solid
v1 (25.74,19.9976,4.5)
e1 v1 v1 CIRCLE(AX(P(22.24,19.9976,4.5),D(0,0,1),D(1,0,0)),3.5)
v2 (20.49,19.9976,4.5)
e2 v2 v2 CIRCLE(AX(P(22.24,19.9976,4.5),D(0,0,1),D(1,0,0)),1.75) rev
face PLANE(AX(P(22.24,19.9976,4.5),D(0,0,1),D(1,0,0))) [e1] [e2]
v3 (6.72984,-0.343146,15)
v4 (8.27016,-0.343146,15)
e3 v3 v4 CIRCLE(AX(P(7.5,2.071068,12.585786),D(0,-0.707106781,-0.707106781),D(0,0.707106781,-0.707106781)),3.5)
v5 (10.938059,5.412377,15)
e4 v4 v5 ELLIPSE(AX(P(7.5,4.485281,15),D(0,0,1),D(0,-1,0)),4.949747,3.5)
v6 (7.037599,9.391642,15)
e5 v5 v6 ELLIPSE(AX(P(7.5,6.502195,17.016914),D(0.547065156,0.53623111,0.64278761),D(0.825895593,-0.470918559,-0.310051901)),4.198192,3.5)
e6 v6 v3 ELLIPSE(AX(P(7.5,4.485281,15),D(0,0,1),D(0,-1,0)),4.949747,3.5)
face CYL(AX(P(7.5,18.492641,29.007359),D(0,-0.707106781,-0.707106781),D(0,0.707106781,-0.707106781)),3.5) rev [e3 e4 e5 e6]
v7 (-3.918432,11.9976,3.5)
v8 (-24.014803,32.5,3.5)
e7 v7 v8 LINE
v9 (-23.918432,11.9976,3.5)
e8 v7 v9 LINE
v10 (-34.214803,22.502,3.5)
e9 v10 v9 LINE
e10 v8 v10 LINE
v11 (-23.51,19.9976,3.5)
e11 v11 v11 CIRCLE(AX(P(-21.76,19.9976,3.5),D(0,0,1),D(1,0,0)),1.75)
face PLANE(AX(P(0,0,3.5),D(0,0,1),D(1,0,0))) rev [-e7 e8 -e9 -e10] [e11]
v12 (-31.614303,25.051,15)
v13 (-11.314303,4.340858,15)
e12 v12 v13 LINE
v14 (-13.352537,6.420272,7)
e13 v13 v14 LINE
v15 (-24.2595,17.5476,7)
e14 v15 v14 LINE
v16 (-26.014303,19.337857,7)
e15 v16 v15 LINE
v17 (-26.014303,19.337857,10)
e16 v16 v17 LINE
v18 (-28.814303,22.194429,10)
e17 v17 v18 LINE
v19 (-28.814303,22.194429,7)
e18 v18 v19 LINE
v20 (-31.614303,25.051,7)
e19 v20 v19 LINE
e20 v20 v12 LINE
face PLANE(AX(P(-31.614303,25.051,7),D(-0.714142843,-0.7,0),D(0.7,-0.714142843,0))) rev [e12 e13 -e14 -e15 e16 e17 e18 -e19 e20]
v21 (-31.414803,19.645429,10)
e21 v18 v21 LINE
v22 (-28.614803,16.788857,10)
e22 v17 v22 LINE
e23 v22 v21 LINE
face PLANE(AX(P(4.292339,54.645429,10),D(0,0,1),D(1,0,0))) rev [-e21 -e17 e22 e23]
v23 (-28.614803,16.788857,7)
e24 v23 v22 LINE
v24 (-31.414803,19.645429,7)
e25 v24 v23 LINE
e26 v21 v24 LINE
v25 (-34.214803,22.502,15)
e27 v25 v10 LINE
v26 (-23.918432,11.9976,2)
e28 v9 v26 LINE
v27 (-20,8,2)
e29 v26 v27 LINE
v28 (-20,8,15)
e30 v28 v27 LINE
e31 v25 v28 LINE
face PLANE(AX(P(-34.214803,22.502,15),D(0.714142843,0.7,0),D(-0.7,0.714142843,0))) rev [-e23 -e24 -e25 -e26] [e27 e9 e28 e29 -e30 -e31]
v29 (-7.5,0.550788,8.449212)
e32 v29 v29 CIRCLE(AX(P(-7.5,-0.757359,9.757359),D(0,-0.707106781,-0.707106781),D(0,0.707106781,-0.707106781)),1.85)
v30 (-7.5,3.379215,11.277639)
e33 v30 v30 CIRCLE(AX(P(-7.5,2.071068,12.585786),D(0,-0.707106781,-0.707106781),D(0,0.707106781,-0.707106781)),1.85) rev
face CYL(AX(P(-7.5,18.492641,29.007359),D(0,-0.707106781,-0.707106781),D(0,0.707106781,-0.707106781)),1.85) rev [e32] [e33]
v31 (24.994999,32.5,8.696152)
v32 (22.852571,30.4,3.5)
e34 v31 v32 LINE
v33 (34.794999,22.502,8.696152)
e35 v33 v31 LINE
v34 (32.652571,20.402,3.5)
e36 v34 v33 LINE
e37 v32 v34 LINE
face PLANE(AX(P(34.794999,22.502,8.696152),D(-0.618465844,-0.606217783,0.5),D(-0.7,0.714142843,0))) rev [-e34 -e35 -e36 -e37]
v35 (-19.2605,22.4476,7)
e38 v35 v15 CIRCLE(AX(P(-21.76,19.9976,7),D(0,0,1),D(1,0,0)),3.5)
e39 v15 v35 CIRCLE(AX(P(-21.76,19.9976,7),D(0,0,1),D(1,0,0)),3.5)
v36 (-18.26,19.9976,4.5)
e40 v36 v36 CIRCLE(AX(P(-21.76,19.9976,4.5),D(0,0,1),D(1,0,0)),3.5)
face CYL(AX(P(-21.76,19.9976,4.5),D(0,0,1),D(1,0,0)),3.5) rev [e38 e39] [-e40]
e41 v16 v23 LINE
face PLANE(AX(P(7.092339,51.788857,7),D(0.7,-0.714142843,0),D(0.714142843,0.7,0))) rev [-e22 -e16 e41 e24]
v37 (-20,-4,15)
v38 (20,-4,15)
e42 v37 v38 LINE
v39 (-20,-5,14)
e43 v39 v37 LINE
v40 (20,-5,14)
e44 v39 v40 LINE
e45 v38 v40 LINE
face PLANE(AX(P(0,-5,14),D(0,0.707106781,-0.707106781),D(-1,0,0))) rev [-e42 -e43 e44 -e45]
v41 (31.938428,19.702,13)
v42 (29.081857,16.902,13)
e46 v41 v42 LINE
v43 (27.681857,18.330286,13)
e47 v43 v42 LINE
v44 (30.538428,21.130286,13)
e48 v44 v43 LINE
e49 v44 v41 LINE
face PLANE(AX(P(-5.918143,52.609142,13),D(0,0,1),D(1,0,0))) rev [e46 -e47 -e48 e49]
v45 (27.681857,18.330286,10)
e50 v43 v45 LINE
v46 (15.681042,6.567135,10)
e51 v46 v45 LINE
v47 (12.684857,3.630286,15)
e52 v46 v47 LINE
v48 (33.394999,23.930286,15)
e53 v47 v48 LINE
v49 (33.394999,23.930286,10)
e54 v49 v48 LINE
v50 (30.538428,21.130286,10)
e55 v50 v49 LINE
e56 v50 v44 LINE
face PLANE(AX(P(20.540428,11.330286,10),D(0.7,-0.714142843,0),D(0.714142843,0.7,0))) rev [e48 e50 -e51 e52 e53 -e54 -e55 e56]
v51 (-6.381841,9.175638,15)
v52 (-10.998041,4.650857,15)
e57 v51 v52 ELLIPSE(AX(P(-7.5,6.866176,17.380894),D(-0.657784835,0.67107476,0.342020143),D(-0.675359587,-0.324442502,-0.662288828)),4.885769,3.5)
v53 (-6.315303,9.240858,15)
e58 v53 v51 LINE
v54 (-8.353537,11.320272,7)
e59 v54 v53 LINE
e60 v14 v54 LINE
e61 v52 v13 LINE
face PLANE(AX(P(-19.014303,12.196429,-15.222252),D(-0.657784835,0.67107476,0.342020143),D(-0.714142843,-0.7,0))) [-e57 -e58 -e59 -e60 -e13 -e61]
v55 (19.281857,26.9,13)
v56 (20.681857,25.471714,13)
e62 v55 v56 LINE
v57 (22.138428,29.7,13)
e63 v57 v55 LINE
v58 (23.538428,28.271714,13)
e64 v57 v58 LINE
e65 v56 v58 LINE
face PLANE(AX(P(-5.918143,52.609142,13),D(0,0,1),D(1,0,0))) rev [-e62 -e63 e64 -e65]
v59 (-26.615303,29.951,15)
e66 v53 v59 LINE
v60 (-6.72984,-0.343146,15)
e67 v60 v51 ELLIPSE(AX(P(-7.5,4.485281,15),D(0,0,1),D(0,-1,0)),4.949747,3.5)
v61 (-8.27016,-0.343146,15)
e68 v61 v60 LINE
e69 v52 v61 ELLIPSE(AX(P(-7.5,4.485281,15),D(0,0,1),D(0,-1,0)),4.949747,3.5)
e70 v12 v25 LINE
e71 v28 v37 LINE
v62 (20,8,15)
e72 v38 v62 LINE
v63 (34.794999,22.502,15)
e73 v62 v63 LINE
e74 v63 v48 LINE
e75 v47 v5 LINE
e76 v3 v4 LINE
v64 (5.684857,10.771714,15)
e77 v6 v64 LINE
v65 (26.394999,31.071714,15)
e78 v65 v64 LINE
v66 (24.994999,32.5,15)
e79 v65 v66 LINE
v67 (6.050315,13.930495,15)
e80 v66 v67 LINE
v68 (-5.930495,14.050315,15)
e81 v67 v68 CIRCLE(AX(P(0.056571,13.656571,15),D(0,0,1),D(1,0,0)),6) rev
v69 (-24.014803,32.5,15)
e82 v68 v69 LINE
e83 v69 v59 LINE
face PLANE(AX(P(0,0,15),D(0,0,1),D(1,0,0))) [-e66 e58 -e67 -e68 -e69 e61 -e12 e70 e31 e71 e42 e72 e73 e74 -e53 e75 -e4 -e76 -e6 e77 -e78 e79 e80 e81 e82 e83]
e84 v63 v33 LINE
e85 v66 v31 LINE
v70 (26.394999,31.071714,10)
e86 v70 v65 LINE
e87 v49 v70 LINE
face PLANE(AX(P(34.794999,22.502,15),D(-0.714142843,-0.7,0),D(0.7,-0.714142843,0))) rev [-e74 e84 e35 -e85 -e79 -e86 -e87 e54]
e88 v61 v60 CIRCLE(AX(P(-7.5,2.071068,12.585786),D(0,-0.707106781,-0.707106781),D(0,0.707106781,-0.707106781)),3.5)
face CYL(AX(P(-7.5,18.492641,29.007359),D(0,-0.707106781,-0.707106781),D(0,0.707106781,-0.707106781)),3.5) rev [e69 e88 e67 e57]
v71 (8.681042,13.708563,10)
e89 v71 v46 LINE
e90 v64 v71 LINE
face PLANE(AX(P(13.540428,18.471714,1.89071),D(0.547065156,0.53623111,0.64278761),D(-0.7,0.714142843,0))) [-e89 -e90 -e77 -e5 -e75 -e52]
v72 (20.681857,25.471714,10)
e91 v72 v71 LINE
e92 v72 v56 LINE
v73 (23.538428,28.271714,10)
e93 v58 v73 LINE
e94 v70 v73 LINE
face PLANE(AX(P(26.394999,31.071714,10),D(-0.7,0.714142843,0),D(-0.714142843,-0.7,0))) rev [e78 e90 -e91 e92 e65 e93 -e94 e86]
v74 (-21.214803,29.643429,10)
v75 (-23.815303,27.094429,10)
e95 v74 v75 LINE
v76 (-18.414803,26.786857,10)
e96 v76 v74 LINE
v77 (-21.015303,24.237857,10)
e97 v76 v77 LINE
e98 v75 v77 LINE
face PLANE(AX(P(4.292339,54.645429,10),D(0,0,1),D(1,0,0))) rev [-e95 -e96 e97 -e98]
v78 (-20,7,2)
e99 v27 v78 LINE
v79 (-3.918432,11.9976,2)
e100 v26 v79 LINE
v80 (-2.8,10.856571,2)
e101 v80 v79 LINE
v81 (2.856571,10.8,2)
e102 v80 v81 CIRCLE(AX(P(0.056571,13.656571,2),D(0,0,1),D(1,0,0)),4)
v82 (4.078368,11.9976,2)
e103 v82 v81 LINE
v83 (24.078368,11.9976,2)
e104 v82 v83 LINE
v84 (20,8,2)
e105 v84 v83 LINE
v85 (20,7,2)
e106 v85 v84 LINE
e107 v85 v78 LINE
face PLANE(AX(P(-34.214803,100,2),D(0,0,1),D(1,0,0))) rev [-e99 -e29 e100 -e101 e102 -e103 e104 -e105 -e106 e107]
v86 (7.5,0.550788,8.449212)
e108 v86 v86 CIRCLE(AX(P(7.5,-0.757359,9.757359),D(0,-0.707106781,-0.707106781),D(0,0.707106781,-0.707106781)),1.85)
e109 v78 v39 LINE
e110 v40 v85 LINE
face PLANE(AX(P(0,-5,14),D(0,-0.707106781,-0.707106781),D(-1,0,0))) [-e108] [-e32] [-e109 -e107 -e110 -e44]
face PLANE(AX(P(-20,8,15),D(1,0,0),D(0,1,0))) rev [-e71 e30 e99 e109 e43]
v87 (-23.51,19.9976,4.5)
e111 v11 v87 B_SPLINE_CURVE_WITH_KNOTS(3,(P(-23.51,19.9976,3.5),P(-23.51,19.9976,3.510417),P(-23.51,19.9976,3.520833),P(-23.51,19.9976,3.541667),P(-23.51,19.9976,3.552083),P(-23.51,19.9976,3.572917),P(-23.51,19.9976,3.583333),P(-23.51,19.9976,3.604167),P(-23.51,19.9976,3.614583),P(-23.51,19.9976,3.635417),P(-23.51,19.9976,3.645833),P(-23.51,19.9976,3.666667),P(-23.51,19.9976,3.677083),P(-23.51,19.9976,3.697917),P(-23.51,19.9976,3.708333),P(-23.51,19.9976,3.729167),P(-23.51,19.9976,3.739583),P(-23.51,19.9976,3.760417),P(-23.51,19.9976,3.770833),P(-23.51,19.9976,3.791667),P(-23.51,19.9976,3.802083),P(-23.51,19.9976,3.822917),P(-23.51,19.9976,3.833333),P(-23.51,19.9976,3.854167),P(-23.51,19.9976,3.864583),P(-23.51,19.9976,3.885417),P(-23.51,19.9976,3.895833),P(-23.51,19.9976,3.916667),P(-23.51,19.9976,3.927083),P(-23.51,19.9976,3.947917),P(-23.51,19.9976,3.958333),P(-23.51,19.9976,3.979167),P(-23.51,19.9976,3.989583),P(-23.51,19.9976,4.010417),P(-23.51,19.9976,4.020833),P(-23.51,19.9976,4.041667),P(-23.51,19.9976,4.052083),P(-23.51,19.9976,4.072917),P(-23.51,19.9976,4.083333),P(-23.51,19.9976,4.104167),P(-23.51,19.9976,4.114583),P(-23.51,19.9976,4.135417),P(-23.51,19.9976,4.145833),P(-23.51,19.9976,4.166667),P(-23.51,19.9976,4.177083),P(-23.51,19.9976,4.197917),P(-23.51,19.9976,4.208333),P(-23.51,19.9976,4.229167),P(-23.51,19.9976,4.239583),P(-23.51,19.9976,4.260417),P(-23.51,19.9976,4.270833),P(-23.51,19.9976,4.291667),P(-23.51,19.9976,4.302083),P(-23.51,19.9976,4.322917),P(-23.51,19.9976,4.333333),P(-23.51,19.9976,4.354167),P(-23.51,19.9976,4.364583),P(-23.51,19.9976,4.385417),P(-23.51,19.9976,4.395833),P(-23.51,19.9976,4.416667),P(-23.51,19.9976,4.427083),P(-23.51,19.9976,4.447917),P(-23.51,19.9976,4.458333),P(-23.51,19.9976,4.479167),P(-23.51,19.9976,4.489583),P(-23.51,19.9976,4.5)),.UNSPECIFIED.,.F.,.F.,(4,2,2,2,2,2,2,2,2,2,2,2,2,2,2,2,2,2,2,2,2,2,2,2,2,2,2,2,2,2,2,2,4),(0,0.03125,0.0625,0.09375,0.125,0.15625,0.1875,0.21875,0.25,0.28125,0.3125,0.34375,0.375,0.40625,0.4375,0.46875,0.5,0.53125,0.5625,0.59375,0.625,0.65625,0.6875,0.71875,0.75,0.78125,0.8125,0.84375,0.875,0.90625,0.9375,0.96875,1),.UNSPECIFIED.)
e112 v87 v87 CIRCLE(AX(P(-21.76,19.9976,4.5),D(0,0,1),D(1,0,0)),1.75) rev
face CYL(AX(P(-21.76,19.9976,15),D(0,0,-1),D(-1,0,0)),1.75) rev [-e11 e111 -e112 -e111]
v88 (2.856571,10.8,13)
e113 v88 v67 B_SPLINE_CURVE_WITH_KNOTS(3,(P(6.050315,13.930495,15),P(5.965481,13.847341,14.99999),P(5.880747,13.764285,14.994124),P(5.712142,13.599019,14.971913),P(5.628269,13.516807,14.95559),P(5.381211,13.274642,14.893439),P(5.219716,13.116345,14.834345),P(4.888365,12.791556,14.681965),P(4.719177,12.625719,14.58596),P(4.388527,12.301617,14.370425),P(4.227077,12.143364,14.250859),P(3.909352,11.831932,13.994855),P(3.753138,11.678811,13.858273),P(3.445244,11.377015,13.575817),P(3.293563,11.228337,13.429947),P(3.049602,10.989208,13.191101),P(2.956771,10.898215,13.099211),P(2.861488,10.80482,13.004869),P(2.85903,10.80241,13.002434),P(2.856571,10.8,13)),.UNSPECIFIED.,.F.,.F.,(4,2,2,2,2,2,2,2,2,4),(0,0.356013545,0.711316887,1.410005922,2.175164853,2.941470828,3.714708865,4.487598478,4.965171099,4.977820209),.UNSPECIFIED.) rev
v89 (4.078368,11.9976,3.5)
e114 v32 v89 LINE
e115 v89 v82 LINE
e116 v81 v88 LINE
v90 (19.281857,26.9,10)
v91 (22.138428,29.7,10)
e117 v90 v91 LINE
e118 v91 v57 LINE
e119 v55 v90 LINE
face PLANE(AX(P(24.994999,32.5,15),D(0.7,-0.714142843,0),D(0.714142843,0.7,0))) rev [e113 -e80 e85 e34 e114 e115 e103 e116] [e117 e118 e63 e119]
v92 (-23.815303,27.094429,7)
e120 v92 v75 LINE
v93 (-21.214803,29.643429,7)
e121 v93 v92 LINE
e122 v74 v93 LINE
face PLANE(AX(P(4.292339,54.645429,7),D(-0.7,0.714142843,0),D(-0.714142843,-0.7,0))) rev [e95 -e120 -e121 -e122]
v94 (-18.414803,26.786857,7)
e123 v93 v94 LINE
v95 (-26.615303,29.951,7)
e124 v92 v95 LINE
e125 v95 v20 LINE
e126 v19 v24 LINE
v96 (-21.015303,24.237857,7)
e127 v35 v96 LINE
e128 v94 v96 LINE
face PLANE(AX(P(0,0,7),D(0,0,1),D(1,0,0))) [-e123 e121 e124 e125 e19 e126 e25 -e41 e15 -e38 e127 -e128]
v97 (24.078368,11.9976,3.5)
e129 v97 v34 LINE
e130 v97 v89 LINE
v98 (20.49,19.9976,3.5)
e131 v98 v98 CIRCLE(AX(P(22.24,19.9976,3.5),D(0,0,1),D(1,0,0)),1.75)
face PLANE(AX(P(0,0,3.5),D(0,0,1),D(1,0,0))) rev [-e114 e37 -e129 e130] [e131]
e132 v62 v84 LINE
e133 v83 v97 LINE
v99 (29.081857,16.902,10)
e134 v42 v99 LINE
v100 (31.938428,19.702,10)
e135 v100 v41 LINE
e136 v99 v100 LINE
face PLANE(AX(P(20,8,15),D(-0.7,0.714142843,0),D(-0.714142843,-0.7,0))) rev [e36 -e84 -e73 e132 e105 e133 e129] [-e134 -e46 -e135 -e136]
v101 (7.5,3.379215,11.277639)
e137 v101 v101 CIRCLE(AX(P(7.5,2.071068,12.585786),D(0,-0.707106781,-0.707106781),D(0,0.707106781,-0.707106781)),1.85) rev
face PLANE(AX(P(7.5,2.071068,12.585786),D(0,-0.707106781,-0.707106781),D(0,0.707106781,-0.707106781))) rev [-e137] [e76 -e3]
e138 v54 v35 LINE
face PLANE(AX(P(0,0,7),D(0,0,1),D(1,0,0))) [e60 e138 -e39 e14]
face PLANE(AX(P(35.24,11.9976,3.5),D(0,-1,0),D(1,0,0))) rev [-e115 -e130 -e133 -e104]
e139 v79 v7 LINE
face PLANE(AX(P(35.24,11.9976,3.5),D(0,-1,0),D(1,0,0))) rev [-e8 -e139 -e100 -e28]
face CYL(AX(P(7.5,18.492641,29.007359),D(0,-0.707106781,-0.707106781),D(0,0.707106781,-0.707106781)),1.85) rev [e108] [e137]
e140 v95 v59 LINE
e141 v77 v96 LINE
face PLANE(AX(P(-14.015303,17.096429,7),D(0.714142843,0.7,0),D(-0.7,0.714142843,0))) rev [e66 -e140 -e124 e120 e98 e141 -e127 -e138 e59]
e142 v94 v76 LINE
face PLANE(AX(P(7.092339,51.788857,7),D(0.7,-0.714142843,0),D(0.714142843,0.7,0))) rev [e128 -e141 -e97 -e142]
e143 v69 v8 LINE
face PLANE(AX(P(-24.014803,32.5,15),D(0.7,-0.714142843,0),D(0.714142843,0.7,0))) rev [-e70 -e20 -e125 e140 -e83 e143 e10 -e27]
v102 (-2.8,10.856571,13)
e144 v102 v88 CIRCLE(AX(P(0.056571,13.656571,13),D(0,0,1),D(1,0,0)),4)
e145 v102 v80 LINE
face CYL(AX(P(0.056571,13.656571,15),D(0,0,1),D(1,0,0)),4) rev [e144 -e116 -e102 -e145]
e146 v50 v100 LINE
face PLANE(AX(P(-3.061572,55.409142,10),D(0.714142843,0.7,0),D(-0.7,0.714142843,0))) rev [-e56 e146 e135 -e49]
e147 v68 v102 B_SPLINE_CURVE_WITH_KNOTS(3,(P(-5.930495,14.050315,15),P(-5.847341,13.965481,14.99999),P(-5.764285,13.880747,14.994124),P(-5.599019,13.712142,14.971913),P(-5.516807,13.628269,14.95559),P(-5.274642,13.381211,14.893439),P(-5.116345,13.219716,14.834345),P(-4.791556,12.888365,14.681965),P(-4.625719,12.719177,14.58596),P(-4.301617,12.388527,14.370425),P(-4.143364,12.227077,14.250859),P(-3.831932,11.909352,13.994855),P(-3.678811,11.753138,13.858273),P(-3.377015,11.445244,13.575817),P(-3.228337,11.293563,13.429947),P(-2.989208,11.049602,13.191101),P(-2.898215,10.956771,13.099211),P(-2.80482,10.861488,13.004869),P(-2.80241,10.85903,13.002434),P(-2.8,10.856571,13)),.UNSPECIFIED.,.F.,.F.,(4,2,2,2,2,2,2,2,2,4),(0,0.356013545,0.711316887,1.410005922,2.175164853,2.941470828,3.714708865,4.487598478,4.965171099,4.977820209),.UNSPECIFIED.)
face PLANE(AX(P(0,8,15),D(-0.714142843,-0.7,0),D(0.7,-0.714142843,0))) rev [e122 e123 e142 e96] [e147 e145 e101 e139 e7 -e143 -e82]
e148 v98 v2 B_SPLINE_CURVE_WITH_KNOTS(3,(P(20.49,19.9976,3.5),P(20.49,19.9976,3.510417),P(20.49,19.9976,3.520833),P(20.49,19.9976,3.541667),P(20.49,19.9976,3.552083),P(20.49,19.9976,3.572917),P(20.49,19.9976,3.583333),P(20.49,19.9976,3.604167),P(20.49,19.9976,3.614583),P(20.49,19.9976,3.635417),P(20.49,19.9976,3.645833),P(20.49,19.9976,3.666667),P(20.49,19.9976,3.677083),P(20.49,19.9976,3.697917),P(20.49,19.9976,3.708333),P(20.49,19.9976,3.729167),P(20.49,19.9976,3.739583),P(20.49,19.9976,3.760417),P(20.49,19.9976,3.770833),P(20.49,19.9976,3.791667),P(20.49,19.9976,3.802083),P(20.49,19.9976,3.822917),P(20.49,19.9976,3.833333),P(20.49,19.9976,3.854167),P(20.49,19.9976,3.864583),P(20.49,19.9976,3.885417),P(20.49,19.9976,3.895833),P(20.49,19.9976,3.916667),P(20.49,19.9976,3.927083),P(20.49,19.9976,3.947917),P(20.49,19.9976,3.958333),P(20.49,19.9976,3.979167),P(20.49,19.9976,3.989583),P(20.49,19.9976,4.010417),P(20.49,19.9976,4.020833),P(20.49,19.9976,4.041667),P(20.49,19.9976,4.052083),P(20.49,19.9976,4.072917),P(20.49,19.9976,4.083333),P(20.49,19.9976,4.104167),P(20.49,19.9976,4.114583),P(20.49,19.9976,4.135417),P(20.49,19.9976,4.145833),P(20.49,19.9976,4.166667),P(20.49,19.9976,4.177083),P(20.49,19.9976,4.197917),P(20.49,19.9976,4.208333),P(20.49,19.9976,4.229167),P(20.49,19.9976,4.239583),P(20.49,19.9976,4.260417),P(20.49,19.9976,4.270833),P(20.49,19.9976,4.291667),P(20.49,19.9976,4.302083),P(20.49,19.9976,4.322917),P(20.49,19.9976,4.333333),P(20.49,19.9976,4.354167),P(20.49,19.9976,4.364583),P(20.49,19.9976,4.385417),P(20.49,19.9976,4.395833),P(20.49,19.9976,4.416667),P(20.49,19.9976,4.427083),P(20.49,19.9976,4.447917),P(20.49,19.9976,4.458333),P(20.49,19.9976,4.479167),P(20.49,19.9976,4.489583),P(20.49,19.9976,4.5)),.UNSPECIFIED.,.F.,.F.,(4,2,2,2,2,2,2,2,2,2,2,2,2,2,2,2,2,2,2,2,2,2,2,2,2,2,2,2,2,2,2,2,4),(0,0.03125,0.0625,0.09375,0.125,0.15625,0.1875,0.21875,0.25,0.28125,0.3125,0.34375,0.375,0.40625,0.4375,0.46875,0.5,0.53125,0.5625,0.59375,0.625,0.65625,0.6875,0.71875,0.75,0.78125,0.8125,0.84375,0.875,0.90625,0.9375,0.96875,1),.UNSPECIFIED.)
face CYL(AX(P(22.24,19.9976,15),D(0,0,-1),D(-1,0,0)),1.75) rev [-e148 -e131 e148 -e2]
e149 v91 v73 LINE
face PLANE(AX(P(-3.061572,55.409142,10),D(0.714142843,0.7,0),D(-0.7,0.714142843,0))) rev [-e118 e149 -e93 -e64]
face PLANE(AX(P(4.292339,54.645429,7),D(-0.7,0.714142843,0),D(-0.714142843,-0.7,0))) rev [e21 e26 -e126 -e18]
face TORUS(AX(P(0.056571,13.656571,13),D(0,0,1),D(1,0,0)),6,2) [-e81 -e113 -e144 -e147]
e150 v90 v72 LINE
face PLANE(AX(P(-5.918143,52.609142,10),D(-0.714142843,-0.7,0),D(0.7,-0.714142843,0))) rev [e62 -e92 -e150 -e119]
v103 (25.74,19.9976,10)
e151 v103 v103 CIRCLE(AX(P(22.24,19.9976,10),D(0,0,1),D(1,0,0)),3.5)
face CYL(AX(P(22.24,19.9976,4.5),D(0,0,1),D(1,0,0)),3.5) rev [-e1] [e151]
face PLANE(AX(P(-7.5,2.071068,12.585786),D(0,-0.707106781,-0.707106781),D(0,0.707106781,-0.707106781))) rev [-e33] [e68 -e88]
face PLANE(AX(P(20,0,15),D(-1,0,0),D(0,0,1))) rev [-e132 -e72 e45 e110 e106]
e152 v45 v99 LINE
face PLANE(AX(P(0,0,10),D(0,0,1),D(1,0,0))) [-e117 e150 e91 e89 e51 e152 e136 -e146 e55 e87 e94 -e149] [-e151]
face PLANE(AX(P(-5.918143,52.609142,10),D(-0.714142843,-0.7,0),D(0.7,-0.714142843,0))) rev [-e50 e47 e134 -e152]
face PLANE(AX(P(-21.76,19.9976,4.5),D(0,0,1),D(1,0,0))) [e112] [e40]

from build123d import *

# Parameters (mm, degrees)
BOSS_EXTRU_1_DEPTH       = 15
ENL_V_MAT_EXTRU_1_DEPTH  = 5
ENL_V_MAT_EXTRU_2_DEPTH  = 8
CHANFREIN1_SIZE          = 11
CHANFREIN1_SIZE_2        = 13.109289519
ESQUISSE8_W              = 3
ESQUISSE8_H              = 4
ENL_V_MAT_EXTRU_6_DEPTH  = 50
ESQUISSE7_W              = 4
ESQUISSE7_H              = 3
ENL_V_MAT_EXTRU_5_DEPTH  = 50
ESQUISSE6_W              = 69.009802941
ESQUISSE6_H              = 2
ENL_V_MAT_EXTRU_4_DEPTH  = 100
CHANFREIN2_SIZE          = 11
CHANFREIN2_SIZE_2        = 30.222251614
ESQUISSE9_W              = 40
ESQUISSE9_H              = 13
BOSS_EXTRU_2_DEPTH       = 5
CHANFREIN4_SIZE          = 12
ESQUISSE10_R             = 1.75
ENL_V_MAT_EXTRU_7_DEPTH  = 1.5
CHANFREIN5_SIZE          = 3
CHANFREIN5_SIZE2         = 5.196152423
ESQUISSE11_R             = 1.75
ENL_V_MAT_EXTRU_8_DEPTH  = 50.355263045
ESQUISSE12_R             = 3.5
ENL_V_MAT_EXTRU_9_DEPTH  = 2.5
ESQUISSE13_R             = 3.5
ENL_V_MAT_EXTRU_10_DEPTH = 5.5
CONG_1_R                 = 4
CHANFREIN10_SIZE         = 1
ESQUISSE14_R             = 1.85
ENL_V_MAT_EXTRU_11_DEPTH = 46.879646797
ENL_V_START              = -4
ESQUISSE15_R             = 3.5
ENL_V_MAT_EXTRU_12_DEPTH = 42.879646797


with BuildPart() as part:
    # Esquisse1 → Boss.-Extru.1 (new body)
    with BuildSketch(Plane.XY):
        Polygon((-20, 0), (20, 0), (20, 8), (34.7949995, 22.5020002), (24.9949995, 32.5), (0, 8), (-24.014803441, 32.5), (-34.214803441, 22.5020002), (-20, 8), align=None)
    extrude(amount=BOSS_EXTRU_1_DEPTH)

    # Esquisse2 → Enlèv. mat.-Extru.1 (cut)
    with BuildSketch(Plane.XY.offset(15)):
        Polygon((26.3949995, 31.071714314), (13.540428329, 18.471714314), (20.540428329, 11.330285886), (33.3949995, 23.930285886), align=None)
    extrude(amount=-ENL_V_MAT_EXTRU_1_DEPTH, mode=Mode.SUBTRACT)

    # Esquisse3 → Enlèv. mat.-Extru.2 (cut)
    with BuildSketch(Plane.XY.offset(15)):
        Polygon((-31.614303391, 25.0510001), (-19.014303391, 12.196428929), (-14.015303491, 17.096428929), (-26.615303491, 29.9510001), align=None)
    extrude(amount=-ENL_V_MAT_EXTRU_2_DEPTH, mode=Mode.SUBTRACT)

    # Chanfrein1
    # the kernel refuses this chamfer: 13.109289519, 11 mm, written as the material it takes off along each edge
    with BuildSketch(Plane(origin=(13.540428329, 18.471714314, 15), x_dir=(-0.7141428428542841, -0.7000000000000011, 0), z_dir=(0.7000000000000011, -0.7141428428542841, 0))) as chanfrein1_piece_1_section:
        Polygon((CHANFREIN1_SIZE, 0), (0, CHANFREIN1_SIZE_2), (0, 0), align=None)
    chanfrein1_piece_1 = extrude(amount=10, mode=Mode.PRIVATE)
    chanfrein1_piece_1 = split(chanfrein1_piece_1, bisect_by=Plane(origin=(13.540428329, 18.471714314, 10), z_dir=(0, 0, 1)), keep=Keep.TOP, mode=Mode.PRIVATE)
    add(chanfrein1_piece_1, mode=Mode.SUBTRACT)

    # Esquisse8 → Enlèv. mat.-Extru.6 (cut)
    with BuildSketch(Plane(origin=(-6.20080008, -6.0779998, 0), x_dir=(0, 0, 1), z_dir=(-0.7141428428542848, -0.7000000000000004, 0))):
        with Locations((8.5, 34.020004802)):
            Rectangle(ESQUISSE8_W, ESQUISSE8_H)
    extrude(amount=-ENL_V_MAT_EXTRU_6_DEPTH, mode=Mode.SUBTRACT)

    # Esquisse7 → Enlèv. mat.-Extru.5 (cut)
    with BuildSketch(Plane(origin=(5.80080008, -5.9179998, 0), x_dir=(0.714142842854285, 0.7000000000000002, 0), z_dir=(0.7000000000000002, -0.714142842854285, 0))):
        with Locations((34.6, 11.5)):
            Rectangle(ESQUISSE7_W, ESQUISSE7_H)
    extrude(amount=-ENL_V_MAT_EXTRU_5_DEPTH, mode=Mode.SUBTRACT)

    # Esquisse6 → Enlèv. mat.-Extru.4 (cut)
    with BuildSketch(Plane.XZ):
        with Locations((0.29009803, 1)):
            Rectangle(ESQUISSE6_W, ESQUISSE6_H)
    extrude(amount=-ENL_V_MAT_EXTRU_4_DEPTH, mode=Mode.SUBTRACT)

    # Chanfrein2
    # the kernel refuses this chamfer: 30.222251614, 11 mm, written as the material it takes off along each edge
    with BuildSketch(Plane(origin=(-19.014303391, 12.196428929, 15), x_dir=(0.7000000000000006, -0.7141428428542845, 0), z_dir=(0.7141428428542845, 0.7000000000000005, 0))) as chanfrein2_piece_1_section:
        Polygon((CHANFREIN2_SIZE, 0), (0, CHANFREIN2_SIZE_2), (0, 0), align=None)
    chanfrein2_piece_1 = extrude(amount=7, mode=Mode.PRIVATE)
    chanfrein2_piece_1 = split(chanfrein2_piece_1, bisect_by=Plane(origin=(-19.014303391, 12.196428929, 7), z_dir=(0, 0, 1)), keep=Keep.TOP, mode=Mode.PRIVATE)
    add(chanfrein2_piece_1, mode=Mode.SUBTRACT)

    # Esquisse9 → Boss.-Extru.2 (add)
    with BuildSketch(Plane.XZ):
        with Locations((0, 8.5)):
            Rectangle(ESQUISSE9_W, ESQUISSE9_H)
    extrude(amount=BOSS_EXTRU_2_DEPTH)

    # Chanfrein4
    chanfrein4_edges = [part.edges().sort_by_distance(p)[0] for p in [
        (0, -5, 2),
    ]]
    chamfer(chanfrein4_edges, length=CHANFREIN4_SIZE)

    # Esquisse10 → Enlèv. mat.-Extru.7 (cut)
    with BuildSketch(Plane(origin=(0, 0, 2), x_dir=(-1, 0, 0), z_dir=(0, 0, -1))):
        Polygon((-35.24, 27.99759976), (-35.24, 11.99759976), (34.76, 11.99759976), (34.76, 27.99759976), (34.76, 37.99759976), (-35.24, 37.99759976), align=None)
        with Locations((-22.24, 19.99759976)):
            Circle(ESQUISSE10_R, mode=Mode.SUBTRACT)
        with Locations((21.76, 19.99759976)):
            Circle(ESQUISSE10_R, mode=Mode.SUBTRACT)
    extrude(amount=-ENL_V_MAT_EXTRU_7_DEPTH, mode=Mode.SUBTRACT)

    # Chanfrein5
    chanfrein5_edges = [part.edges().sort_by_distance(p)[0] for p in [
        (29.8949995, 27.5010001, 3.5),
    ]]
    chanfrein5_side = [part.faces().sort_by_distance(p)[0] for p in [
        (29.178170188, 17.513536316, 3.5),
    ]]
    chamfer(chanfrein5_edges, length=CHANFREIN5_SIZE, length2=CHANFREIN5_SIZE2, reference=chanfrein5_side[0])

    # Esquisse11 → Enlèv. mat.-Extru.8 (cut, through all)
    with BuildSketch(Plane(origin=(0, 0, 2), x_dir=(-1, 0, 0), z_dir=(0, 0, -1))):
        with Locations((-22.24, 19.99759976)):
            Circle(ESQUISSE11_R)
        with Locations((21.76, 19.99759976)):
            Circle(ESQUISSE11_R)
    extrude(amount=-ENL_V_MAT_EXTRU_8_DEPTH, mode=Mode.SUBTRACT)

    # Esquisse12 → Enlèv. mat.-Extru.9 (cut)
    with BuildSketch(Plane.XY.offset(7)):
        with Locations((-21.76, 19.99759976)):
            Circle(ESQUISSE12_R)
    extrude(amount=-ENL_V_MAT_EXTRU_9_DEPTH, mode=Mode.SUBTRACT)

    # Esquisse13 → Enlèv. mat.-Extru.10 (cut)
    with BuildSketch(Plane.XY.offset(10)):
        with Locations((22.24, 19.99759976)):
            Circle(ESQUISSE13_R)
    extrude(amount=-ENL_V_MAT_EXTRU_10_DEPTH, mode=Mode.SUBTRACT)

    # Congé1
    cong_1_edges = [part.edges().sort_by_distance(p)[0] for p in [
        (0, 8, 8.5),
    ]]
    fillet(cong_1_edges, radius=CONG_1_R)

    # Chanfrein10
    chanfrein10_edges = [part.edges().sort_by_distance(p)[0] for p in [
        (0, -5, 15),
    ]]
    chamfer(chanfrein10_edges, length=CHANFREIN10_SIZE - 0.0001)  # a hair under: the kernel refuses the full size

    # Esquisse14 → Enlèv. mat.-Extru.11 (cut, through all)
    with BuildSketch(Plane(origin=(0, 4.5, 4.5), x_dir=(1, 0, 0), z_dir=(0, -0.7071067811865464, -0.7071067811865488))):
        with Locations(Location((-7.5, 7.435028843, 0), (0, 0, 270))):
            Circle(ESQUISSE14_R)
        with Locations(Location((7.5, 7.435028843, 0), (0, 0, 270))):
            Circle(ESQUISSE14_R)
    extrude(amount=-ENL_V_MAT_EXTRU_11_DEPTH, mode=Mode.SUBTRACT)

    # Esquisse15 → Enlèv. mat.-Extru.12 (cut, through all)
    with BuildSketch(Plane(origin=(0, 4.5, 4.5), x_dir=(1, 0, 0), z_dir=(0, -0.7071067811865464, -0.7071067811865488)).offset(ENL_V_START)):
        with Locations((-7.5, 7.435028843)):
            Circle(ESQUISSE15_R)
        with Locations((7.5, 7.435028843)):
            Circle(ESQUISSE15_R)
    extrude(amount=-ENL_V_MAT_EXTRU_12_DEPTH, mode=Mode.SUBTRACT)

    # Congé2: read off the stored shape, not the designer's step
    # Congé2 outline → Congé2 (revolve, cut)
    with BuildSketch(Plane(origin=(0.056571371, 13.656571371, 0), x_dir=(1, 0, 0), z_dir=(0, -1, 0))):
        with BuildLine():
            ThreePointArc((4, 13), (4.585786438, 14.414213562), (6, 15))
            Line((6, 15), (4, 15))
            Line((4, 15), (4, 13))
        make_face()
    revolve(axis=Axis((0.056571371, 13.656571371, 0), (0, 0, 1)), mode=Mode.SUBTRACT)


solid = part.part
